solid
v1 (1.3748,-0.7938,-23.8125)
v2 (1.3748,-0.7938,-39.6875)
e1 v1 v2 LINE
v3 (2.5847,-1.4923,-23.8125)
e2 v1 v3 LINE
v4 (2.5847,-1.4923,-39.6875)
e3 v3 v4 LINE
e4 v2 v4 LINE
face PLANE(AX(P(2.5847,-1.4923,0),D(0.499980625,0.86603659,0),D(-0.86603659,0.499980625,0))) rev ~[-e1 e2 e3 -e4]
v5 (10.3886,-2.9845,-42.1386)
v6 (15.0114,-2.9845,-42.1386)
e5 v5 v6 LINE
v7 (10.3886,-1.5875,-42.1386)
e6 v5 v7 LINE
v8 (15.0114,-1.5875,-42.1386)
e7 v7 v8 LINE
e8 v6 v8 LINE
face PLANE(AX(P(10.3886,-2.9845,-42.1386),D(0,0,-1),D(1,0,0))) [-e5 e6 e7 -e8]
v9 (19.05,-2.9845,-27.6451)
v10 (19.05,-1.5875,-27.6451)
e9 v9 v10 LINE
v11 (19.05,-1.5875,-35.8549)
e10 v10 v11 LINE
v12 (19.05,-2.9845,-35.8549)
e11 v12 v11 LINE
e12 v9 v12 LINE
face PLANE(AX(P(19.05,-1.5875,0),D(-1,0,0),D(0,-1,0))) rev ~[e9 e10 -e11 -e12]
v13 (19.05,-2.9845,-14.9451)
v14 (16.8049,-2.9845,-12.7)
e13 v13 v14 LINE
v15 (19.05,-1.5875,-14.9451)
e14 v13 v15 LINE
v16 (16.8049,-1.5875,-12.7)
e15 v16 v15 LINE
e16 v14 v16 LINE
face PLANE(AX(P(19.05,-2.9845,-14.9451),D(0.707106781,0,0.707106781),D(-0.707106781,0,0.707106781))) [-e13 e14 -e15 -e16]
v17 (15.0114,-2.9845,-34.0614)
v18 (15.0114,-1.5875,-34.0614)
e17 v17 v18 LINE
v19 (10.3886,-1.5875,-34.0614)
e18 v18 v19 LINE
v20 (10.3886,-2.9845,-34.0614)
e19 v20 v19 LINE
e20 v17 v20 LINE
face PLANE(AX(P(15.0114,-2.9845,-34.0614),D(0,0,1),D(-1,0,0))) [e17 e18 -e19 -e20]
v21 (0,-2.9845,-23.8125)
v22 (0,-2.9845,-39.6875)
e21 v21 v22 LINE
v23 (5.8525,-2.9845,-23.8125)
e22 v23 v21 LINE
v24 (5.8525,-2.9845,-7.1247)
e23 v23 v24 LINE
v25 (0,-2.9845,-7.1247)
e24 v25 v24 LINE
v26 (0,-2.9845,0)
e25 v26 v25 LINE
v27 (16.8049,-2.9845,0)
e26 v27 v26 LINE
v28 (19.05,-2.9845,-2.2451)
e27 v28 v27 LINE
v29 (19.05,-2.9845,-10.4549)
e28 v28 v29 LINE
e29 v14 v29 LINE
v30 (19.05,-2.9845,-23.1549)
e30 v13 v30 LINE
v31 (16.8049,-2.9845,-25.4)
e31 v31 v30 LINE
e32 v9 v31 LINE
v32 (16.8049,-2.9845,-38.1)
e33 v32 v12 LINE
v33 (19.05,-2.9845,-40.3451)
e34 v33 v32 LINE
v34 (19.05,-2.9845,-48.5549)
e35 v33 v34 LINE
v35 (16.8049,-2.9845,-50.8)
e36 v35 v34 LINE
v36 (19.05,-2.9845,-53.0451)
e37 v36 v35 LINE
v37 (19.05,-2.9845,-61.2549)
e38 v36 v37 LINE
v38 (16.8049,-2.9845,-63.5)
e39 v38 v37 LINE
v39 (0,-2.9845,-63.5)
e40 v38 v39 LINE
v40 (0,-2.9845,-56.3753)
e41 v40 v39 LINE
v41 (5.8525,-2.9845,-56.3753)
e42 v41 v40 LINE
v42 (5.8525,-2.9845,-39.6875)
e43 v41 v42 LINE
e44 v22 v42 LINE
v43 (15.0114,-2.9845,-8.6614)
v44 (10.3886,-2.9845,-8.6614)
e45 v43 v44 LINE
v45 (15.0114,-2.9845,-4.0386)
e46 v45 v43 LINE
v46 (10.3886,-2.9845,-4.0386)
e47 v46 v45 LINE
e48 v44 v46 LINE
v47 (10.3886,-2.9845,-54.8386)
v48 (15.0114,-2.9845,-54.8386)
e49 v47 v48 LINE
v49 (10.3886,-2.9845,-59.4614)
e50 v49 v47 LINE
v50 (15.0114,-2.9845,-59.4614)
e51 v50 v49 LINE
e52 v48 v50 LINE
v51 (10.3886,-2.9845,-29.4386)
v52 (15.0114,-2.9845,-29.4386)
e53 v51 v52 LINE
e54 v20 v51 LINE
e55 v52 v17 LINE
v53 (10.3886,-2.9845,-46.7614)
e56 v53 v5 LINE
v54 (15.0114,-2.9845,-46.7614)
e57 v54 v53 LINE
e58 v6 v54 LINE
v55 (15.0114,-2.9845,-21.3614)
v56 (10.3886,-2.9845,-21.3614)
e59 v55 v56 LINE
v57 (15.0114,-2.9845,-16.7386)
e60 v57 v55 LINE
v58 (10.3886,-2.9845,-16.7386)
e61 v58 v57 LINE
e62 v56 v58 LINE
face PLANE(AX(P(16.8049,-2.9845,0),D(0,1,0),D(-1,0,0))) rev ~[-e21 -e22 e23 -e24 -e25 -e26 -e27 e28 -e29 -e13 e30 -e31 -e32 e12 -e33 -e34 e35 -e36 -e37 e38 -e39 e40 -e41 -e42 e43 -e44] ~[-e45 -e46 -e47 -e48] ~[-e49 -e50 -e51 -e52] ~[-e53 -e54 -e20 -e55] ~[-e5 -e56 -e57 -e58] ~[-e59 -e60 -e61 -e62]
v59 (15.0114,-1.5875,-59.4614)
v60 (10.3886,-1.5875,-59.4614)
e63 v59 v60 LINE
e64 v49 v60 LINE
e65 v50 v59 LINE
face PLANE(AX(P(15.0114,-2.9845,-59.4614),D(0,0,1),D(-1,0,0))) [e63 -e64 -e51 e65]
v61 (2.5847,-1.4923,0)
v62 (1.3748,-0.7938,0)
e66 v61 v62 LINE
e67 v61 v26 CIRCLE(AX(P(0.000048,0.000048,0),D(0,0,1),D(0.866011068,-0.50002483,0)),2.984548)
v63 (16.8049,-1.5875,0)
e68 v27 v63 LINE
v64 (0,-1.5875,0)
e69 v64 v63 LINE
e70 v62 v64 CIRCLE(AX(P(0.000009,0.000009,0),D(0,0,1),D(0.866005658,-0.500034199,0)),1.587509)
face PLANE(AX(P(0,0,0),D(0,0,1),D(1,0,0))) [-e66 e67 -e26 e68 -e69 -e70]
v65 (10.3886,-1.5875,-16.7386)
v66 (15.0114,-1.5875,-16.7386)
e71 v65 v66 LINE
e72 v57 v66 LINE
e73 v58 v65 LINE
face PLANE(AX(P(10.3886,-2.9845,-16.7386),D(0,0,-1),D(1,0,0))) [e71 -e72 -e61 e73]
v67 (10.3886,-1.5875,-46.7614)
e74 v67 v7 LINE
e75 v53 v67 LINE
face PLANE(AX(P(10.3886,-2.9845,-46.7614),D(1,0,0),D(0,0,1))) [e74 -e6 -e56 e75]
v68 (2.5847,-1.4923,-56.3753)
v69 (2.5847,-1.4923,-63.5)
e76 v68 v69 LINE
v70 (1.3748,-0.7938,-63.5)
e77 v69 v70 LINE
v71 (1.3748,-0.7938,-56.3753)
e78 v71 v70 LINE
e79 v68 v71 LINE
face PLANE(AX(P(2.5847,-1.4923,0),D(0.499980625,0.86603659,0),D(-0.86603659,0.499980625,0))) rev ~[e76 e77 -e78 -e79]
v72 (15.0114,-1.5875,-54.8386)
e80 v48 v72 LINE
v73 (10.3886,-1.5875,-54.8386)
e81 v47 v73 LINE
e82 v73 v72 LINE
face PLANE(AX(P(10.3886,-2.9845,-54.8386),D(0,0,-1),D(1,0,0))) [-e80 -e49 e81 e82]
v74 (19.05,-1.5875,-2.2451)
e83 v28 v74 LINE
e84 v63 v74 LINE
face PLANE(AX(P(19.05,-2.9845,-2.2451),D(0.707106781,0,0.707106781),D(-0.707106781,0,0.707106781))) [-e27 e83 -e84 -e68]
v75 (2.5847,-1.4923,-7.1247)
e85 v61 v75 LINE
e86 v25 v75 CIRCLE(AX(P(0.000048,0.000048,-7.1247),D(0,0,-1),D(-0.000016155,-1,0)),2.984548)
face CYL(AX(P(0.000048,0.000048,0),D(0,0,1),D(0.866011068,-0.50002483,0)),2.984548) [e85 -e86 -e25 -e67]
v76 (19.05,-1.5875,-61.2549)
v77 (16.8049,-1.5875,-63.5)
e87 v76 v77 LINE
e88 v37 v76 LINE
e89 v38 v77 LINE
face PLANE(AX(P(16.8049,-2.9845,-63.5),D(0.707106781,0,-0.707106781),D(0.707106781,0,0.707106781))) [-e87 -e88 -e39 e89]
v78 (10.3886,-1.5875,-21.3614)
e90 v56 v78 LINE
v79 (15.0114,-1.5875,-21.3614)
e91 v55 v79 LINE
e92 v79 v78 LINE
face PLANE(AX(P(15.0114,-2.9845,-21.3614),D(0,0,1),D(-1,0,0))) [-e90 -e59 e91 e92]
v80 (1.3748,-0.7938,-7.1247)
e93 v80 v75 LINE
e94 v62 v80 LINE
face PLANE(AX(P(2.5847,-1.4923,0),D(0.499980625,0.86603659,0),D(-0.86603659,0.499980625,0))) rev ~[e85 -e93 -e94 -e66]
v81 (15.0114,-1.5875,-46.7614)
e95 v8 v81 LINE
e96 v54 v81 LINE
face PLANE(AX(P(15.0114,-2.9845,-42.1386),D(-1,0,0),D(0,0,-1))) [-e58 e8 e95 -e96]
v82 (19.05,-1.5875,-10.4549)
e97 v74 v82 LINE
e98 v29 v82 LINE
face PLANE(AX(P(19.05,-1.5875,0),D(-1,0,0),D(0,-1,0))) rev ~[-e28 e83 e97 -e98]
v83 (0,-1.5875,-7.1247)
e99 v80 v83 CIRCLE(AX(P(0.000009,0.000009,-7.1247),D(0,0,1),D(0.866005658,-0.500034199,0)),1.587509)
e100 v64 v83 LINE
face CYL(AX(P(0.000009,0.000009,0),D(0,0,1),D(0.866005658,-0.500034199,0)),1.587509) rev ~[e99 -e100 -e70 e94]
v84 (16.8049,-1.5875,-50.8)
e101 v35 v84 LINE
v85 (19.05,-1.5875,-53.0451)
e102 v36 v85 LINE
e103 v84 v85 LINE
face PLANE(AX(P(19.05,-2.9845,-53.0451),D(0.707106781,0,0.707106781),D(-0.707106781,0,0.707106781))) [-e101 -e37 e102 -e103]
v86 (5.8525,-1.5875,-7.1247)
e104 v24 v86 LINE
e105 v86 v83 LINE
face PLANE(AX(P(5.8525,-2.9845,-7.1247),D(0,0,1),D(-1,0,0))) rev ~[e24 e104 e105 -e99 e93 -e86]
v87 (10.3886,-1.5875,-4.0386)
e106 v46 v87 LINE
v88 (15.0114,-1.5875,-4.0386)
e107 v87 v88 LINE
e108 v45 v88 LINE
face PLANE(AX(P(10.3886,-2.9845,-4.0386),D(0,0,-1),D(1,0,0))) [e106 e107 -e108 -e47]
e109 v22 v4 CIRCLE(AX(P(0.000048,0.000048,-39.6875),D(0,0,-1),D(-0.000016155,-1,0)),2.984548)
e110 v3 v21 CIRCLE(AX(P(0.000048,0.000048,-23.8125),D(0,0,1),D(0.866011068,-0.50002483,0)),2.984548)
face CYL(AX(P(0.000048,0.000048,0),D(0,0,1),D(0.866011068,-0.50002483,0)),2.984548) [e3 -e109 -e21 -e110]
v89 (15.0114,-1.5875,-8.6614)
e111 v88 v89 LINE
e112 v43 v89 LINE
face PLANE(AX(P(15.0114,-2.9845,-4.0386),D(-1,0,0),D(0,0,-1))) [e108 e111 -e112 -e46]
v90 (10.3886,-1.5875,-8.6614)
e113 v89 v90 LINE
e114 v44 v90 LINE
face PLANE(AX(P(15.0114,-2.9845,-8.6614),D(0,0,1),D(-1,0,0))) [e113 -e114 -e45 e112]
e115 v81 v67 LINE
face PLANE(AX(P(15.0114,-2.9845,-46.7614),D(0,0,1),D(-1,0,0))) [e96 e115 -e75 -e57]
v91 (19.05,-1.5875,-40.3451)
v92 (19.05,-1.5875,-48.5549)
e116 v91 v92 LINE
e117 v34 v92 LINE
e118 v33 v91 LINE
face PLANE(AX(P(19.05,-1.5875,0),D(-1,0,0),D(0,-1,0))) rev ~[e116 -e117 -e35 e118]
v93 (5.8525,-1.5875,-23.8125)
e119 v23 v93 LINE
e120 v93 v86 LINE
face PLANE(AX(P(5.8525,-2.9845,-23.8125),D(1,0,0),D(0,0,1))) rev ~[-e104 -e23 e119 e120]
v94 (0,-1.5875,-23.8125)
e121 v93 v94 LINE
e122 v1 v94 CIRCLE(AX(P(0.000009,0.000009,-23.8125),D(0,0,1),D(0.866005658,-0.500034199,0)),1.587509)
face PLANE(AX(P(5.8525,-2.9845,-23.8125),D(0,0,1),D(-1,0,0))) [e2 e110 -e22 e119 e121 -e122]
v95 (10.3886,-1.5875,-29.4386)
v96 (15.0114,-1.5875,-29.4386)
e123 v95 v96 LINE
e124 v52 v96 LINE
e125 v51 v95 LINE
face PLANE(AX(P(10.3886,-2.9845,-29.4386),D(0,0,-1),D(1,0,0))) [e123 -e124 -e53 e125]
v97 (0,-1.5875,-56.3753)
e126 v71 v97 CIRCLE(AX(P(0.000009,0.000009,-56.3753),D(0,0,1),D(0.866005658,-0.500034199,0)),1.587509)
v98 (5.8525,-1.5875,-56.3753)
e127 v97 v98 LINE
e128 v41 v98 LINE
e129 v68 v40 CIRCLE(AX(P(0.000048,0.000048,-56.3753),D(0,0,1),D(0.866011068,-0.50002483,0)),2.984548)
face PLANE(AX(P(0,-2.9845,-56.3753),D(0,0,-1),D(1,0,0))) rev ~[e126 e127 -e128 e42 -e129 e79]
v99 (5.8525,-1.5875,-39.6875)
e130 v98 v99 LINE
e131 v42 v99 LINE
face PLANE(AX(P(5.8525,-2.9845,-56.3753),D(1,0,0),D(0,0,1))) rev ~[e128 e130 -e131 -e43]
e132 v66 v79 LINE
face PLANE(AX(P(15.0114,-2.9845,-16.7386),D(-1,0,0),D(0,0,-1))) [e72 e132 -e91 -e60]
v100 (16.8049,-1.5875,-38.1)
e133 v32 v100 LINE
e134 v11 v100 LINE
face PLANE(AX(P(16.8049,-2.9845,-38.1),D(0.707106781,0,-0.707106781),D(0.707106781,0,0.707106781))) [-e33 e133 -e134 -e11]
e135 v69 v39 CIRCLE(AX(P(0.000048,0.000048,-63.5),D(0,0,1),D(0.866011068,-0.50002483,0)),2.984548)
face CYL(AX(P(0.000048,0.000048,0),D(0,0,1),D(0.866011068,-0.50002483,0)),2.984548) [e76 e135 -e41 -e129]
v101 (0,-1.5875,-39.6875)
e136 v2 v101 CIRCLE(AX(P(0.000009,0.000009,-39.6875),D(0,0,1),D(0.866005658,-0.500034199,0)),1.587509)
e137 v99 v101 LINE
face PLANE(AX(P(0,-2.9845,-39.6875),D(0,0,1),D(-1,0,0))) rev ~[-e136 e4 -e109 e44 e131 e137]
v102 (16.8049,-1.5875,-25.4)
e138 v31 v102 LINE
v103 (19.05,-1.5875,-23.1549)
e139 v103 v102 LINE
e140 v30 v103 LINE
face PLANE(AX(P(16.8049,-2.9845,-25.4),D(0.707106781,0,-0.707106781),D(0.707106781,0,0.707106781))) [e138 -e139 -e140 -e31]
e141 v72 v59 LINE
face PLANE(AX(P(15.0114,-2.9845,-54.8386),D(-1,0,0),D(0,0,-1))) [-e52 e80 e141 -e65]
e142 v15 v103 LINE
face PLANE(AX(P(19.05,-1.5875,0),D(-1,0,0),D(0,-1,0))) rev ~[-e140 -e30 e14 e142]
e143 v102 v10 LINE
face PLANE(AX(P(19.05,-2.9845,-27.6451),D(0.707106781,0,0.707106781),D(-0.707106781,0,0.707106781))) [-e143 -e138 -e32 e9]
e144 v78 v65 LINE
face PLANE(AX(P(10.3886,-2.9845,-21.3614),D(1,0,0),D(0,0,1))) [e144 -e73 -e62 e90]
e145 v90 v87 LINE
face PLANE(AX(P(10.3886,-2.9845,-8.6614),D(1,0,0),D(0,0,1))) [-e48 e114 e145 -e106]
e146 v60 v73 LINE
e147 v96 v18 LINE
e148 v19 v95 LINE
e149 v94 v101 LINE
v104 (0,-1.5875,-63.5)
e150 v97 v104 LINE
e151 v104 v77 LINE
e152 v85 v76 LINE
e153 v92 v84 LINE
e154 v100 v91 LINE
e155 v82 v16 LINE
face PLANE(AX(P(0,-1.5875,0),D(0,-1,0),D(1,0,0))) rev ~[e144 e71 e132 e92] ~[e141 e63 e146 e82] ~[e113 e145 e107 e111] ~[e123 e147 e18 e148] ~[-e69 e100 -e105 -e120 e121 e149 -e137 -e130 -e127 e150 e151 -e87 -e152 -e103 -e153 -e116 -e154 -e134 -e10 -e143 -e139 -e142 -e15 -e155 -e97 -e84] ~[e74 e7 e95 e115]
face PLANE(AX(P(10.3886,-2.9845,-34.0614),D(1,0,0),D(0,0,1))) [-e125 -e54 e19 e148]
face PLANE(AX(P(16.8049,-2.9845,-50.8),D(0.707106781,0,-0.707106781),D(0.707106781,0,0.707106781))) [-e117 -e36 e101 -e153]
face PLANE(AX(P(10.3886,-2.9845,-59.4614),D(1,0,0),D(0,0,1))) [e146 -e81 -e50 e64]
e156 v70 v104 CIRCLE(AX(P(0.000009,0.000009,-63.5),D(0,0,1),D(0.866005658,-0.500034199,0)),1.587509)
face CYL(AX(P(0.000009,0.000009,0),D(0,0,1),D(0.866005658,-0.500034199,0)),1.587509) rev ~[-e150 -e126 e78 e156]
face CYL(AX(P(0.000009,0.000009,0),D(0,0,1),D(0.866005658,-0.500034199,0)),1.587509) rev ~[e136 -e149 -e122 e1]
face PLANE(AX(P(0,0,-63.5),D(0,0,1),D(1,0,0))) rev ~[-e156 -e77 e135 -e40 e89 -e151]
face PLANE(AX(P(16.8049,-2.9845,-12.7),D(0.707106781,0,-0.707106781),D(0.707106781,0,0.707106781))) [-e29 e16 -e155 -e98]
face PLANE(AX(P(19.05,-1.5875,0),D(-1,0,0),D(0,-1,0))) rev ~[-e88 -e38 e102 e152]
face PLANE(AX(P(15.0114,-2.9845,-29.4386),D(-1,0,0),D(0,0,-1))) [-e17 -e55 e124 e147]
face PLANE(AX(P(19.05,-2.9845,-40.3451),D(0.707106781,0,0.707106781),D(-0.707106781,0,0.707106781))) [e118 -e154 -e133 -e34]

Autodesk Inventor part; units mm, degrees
ref_plane "YZ Plane" through (0, 0, 0) normal (1, 0, 0) x (0, 1, 0)
ref_plane "XZ Plane" through (0, 0, 0) normal (0, 1, 0) x (-1, 0, 0)
ref_plane "XY Plane" through (0, 0, 0) normal (0, 0, 1) x (1, 0, 0)
sketch "Sketch1" plane through (0, 0, 0) normal (0, 0, 1) x (1, 0, 0)
  line L0 (2.5847, -1.4923) -> (1.3748, -0.7938)
  arc A0 (2.5847, -1.4923) -> (0, -2.9845) centre (0, 0) ccw
  arc A1 (1.3748, -0.7938) -> (0, -1.5875) centre (0, 0) ccw
  arc A2 (1.3748, -0.7938) -> (0, -1.5875) centre (0, 0) ccw
  line L1 (0, -1.5875) -> (16.8049, -1.5875)
  line L2 (16.8049, -2.9845) -> (0, -2.9845)
  arc A3 (2.5847, -1.4923) -> (0, -2.9845) centre (0, 0) ccw
  line L3 (2.5847, -1.4923) -> (1.3748, -0.7938)
  line L4 (19.05, -1.5875) -> (16.8049, -1.5875)
  line L5 (19.05, -2.9845) -> (16.8049, -2.9845)
  line L6 (19.05, -1.5875) -> (19.05, -2.9845)
  point P0 (0, 0)
  point P1 (15.875, -2.9845)
extrude "Extrusion1" add sketch "Sketch1" against normal blind 63.5
sketch "Sketch2" plane through (0, -2.9845, 0) normal (0, -1, 0) x (1, 0, 0)
  line L0 (19.05, -23.1549) -> (19.05, -14.9451)
  line L1 (19.05, -14.9451) -> (16.8049, -12.7)
  line L2 (16.8049, -12.7) -> (19.05, -10.4549)
  line L3 (19.05, -10.4549) -> (19.05, -2.2451)
  line L4 (19.05, -2.2451) -> (16.8049, 0)
  line L5 (0, 0) -> (16.8049, 0)
  line L6 (0, -7.1247) -> (0, 0)
  line L7 (5.8525, -7.1247) -> (-2.9845, -7.1247)
  line L8 (5.8525, -23.8125) -> (5.8525, -7.1247)
  line L9 (5.8525, -23.8125) -> (-2.9845, -23.8125)
  line L10 (0, -39.6875) -> (0, -23.8125)
  line L11 (5.8525, -39.6875) -> (-2.9845, -39.6875)
  line L12 (5.8525, -56.3753) -> (5.8525, -39.6875)
  line L13 (-2.9845, -56.3753) -> (5.8525, -56.3753)
  line L14 (0, -63.5) -> (0, -56.3753)
  line L15 (16.8049, -63.5) -> (0, -63.5)
  line L16 (16.8049, -63.5) -> (19.05, -61.2549)
  line L17 (19.05, -61.2549) -> (19.05, -53.0451)
  line L18 (19.05, -53.0451) -> (16.8049, -50.8)
  line L19 (16.8049, -50.8) -> (19.05, -48.5549)
  line L20 (19.05, -48.5549) -> (19.05, -40.3451)
  line L21 (19.05, -40.3451) -> (16.8049, -38.1)
  line L22 (16.8049, -38.1) -> (19.05, -35.8549)
  line L23 (19.05, -35.8549) -> (19.05, -27.6451)
  line L24 (19.05, -27.6451) -> (16.8049, -25.4)
  line L25 (16.8049, -25.4) -> (19.05, -23.1549)
  line L26 (15.0114, -42.1386) -> (15.0114, -46.7614)
  line L27 (15.0114, -46.7614) -> (10.3886, -46.7614)
  line L28 (10.3886, -46.7614) -> (10.3886, -42.1386)
  line L29 (10.3886, -42.1386) -> (15.0114, -42.1386)
  line L30 (15.0114, -29.4386) -> (15.0114, -34.0614)
  line L31 (15.0114, -34.0614) -> (10.3886, -34.0614)
  line L32 (10.3886, -34.0614) -> (10.3886, -29.4386)
  line L33 (10.3886, -29.4386) -> (15.0114, -29.4386)
  line L34 (15.0114, -16.7386) -> (15.0114, -21.3614)
  line L35 (15.0114, -21.3614) -> (10.3886, -21.3614)
  line L36 (10.3886, -21.3614) -> (10.3886, -16.7386)
  line L37 (10.3886, -16.7386) -> (15.0114, -16.7386)
  line L38 (15.0114, -4.0386) -> (15.0114, -8.6614)
  line L39 (15.0114, -8.6614) -> (10.3886, -8.6614)
  line L40 (10.3886, -8.6614) -> (10.3886, -4.0386)
  line L41 (10.3886, -4.0386) -> (15.0114, -4.0386)
  line L42 (15.0114, -54.8386) -> (15.0114, -59.4614)
  line L43 (15.0114, -59.4614) -> (10.3886, -59.4614)
  line L44 (10.3886, -59.4614) -> (10.3886, -54.8386)
  line L45 (10.3886, -54.8386) -> (15.0114, -54.8386)
  line L46 (-2.9845, 0) -> (-2.9845, -63.5) projected
  line L47 (19.05, -53.0451) -> (19.05, -48.5549)
  line L48 (19.05, -40.3451) -> (19.05, -35.8549)
  line L49 (19.05, -27.6451) -> (19.05, -23.1549)
  line L50 (19.05, -14.9451) -> (19.05, -10.4549)
  line L51 (0, 0) -> (16.8049, 0) projected
  line L52 (16.8049, -63.5) -> (19.05, -63.5)
  line L53 (19.05, -63.5) -> (19.05, -61.2549)
  line L54 (19.05, -2.2451) -> (19.05, 0)
  line L55 (19.05, 0) -> (16.8049, 0)
  line L56 (16.8049, -63.5) -> (19.05, -61.2549)
  line L57 (19.05, -2.2451) -> (16.8049, 0)
  point P0 (15.875, -31.75)
extrude "Extrusion2" cut sketch "Sketch2" against normal blind 6.35 contours L49 L24 L25 | L1 L2 L50 | L48 L21 L22 | L4 L55 L54 | L47 L18 L19 | L7 L8 L9 L46 | L53 L52 L16 | L11 L12 L13 L46 | L26 L27 L28 L29 | L30 L31 L32 L33 | L34 L35 L36 L37 | L38 L39 L40 L41 | L42 L43 L44 L45
sketch "Sketch3" plane through (0, -2.9845, 0) normal (0, -1, 0) x (1, 0, 0)
  line L0 (15.0114, -8.6614) -> (10.3886, -8.6614) projected
  circle A0 centre (12.7, -6.35) radius 2.3114
surface extrude "ExtrusionSrf1" sketch "Sketch3" against normal up to surface (1.397 mm away) shown no curves A0
pattern_linear "Rectangular Pattern1" count 5 spacing 12.7 along (0, 0, -1) of "ExtrusionSrf1"
properties part number "275-1272"
